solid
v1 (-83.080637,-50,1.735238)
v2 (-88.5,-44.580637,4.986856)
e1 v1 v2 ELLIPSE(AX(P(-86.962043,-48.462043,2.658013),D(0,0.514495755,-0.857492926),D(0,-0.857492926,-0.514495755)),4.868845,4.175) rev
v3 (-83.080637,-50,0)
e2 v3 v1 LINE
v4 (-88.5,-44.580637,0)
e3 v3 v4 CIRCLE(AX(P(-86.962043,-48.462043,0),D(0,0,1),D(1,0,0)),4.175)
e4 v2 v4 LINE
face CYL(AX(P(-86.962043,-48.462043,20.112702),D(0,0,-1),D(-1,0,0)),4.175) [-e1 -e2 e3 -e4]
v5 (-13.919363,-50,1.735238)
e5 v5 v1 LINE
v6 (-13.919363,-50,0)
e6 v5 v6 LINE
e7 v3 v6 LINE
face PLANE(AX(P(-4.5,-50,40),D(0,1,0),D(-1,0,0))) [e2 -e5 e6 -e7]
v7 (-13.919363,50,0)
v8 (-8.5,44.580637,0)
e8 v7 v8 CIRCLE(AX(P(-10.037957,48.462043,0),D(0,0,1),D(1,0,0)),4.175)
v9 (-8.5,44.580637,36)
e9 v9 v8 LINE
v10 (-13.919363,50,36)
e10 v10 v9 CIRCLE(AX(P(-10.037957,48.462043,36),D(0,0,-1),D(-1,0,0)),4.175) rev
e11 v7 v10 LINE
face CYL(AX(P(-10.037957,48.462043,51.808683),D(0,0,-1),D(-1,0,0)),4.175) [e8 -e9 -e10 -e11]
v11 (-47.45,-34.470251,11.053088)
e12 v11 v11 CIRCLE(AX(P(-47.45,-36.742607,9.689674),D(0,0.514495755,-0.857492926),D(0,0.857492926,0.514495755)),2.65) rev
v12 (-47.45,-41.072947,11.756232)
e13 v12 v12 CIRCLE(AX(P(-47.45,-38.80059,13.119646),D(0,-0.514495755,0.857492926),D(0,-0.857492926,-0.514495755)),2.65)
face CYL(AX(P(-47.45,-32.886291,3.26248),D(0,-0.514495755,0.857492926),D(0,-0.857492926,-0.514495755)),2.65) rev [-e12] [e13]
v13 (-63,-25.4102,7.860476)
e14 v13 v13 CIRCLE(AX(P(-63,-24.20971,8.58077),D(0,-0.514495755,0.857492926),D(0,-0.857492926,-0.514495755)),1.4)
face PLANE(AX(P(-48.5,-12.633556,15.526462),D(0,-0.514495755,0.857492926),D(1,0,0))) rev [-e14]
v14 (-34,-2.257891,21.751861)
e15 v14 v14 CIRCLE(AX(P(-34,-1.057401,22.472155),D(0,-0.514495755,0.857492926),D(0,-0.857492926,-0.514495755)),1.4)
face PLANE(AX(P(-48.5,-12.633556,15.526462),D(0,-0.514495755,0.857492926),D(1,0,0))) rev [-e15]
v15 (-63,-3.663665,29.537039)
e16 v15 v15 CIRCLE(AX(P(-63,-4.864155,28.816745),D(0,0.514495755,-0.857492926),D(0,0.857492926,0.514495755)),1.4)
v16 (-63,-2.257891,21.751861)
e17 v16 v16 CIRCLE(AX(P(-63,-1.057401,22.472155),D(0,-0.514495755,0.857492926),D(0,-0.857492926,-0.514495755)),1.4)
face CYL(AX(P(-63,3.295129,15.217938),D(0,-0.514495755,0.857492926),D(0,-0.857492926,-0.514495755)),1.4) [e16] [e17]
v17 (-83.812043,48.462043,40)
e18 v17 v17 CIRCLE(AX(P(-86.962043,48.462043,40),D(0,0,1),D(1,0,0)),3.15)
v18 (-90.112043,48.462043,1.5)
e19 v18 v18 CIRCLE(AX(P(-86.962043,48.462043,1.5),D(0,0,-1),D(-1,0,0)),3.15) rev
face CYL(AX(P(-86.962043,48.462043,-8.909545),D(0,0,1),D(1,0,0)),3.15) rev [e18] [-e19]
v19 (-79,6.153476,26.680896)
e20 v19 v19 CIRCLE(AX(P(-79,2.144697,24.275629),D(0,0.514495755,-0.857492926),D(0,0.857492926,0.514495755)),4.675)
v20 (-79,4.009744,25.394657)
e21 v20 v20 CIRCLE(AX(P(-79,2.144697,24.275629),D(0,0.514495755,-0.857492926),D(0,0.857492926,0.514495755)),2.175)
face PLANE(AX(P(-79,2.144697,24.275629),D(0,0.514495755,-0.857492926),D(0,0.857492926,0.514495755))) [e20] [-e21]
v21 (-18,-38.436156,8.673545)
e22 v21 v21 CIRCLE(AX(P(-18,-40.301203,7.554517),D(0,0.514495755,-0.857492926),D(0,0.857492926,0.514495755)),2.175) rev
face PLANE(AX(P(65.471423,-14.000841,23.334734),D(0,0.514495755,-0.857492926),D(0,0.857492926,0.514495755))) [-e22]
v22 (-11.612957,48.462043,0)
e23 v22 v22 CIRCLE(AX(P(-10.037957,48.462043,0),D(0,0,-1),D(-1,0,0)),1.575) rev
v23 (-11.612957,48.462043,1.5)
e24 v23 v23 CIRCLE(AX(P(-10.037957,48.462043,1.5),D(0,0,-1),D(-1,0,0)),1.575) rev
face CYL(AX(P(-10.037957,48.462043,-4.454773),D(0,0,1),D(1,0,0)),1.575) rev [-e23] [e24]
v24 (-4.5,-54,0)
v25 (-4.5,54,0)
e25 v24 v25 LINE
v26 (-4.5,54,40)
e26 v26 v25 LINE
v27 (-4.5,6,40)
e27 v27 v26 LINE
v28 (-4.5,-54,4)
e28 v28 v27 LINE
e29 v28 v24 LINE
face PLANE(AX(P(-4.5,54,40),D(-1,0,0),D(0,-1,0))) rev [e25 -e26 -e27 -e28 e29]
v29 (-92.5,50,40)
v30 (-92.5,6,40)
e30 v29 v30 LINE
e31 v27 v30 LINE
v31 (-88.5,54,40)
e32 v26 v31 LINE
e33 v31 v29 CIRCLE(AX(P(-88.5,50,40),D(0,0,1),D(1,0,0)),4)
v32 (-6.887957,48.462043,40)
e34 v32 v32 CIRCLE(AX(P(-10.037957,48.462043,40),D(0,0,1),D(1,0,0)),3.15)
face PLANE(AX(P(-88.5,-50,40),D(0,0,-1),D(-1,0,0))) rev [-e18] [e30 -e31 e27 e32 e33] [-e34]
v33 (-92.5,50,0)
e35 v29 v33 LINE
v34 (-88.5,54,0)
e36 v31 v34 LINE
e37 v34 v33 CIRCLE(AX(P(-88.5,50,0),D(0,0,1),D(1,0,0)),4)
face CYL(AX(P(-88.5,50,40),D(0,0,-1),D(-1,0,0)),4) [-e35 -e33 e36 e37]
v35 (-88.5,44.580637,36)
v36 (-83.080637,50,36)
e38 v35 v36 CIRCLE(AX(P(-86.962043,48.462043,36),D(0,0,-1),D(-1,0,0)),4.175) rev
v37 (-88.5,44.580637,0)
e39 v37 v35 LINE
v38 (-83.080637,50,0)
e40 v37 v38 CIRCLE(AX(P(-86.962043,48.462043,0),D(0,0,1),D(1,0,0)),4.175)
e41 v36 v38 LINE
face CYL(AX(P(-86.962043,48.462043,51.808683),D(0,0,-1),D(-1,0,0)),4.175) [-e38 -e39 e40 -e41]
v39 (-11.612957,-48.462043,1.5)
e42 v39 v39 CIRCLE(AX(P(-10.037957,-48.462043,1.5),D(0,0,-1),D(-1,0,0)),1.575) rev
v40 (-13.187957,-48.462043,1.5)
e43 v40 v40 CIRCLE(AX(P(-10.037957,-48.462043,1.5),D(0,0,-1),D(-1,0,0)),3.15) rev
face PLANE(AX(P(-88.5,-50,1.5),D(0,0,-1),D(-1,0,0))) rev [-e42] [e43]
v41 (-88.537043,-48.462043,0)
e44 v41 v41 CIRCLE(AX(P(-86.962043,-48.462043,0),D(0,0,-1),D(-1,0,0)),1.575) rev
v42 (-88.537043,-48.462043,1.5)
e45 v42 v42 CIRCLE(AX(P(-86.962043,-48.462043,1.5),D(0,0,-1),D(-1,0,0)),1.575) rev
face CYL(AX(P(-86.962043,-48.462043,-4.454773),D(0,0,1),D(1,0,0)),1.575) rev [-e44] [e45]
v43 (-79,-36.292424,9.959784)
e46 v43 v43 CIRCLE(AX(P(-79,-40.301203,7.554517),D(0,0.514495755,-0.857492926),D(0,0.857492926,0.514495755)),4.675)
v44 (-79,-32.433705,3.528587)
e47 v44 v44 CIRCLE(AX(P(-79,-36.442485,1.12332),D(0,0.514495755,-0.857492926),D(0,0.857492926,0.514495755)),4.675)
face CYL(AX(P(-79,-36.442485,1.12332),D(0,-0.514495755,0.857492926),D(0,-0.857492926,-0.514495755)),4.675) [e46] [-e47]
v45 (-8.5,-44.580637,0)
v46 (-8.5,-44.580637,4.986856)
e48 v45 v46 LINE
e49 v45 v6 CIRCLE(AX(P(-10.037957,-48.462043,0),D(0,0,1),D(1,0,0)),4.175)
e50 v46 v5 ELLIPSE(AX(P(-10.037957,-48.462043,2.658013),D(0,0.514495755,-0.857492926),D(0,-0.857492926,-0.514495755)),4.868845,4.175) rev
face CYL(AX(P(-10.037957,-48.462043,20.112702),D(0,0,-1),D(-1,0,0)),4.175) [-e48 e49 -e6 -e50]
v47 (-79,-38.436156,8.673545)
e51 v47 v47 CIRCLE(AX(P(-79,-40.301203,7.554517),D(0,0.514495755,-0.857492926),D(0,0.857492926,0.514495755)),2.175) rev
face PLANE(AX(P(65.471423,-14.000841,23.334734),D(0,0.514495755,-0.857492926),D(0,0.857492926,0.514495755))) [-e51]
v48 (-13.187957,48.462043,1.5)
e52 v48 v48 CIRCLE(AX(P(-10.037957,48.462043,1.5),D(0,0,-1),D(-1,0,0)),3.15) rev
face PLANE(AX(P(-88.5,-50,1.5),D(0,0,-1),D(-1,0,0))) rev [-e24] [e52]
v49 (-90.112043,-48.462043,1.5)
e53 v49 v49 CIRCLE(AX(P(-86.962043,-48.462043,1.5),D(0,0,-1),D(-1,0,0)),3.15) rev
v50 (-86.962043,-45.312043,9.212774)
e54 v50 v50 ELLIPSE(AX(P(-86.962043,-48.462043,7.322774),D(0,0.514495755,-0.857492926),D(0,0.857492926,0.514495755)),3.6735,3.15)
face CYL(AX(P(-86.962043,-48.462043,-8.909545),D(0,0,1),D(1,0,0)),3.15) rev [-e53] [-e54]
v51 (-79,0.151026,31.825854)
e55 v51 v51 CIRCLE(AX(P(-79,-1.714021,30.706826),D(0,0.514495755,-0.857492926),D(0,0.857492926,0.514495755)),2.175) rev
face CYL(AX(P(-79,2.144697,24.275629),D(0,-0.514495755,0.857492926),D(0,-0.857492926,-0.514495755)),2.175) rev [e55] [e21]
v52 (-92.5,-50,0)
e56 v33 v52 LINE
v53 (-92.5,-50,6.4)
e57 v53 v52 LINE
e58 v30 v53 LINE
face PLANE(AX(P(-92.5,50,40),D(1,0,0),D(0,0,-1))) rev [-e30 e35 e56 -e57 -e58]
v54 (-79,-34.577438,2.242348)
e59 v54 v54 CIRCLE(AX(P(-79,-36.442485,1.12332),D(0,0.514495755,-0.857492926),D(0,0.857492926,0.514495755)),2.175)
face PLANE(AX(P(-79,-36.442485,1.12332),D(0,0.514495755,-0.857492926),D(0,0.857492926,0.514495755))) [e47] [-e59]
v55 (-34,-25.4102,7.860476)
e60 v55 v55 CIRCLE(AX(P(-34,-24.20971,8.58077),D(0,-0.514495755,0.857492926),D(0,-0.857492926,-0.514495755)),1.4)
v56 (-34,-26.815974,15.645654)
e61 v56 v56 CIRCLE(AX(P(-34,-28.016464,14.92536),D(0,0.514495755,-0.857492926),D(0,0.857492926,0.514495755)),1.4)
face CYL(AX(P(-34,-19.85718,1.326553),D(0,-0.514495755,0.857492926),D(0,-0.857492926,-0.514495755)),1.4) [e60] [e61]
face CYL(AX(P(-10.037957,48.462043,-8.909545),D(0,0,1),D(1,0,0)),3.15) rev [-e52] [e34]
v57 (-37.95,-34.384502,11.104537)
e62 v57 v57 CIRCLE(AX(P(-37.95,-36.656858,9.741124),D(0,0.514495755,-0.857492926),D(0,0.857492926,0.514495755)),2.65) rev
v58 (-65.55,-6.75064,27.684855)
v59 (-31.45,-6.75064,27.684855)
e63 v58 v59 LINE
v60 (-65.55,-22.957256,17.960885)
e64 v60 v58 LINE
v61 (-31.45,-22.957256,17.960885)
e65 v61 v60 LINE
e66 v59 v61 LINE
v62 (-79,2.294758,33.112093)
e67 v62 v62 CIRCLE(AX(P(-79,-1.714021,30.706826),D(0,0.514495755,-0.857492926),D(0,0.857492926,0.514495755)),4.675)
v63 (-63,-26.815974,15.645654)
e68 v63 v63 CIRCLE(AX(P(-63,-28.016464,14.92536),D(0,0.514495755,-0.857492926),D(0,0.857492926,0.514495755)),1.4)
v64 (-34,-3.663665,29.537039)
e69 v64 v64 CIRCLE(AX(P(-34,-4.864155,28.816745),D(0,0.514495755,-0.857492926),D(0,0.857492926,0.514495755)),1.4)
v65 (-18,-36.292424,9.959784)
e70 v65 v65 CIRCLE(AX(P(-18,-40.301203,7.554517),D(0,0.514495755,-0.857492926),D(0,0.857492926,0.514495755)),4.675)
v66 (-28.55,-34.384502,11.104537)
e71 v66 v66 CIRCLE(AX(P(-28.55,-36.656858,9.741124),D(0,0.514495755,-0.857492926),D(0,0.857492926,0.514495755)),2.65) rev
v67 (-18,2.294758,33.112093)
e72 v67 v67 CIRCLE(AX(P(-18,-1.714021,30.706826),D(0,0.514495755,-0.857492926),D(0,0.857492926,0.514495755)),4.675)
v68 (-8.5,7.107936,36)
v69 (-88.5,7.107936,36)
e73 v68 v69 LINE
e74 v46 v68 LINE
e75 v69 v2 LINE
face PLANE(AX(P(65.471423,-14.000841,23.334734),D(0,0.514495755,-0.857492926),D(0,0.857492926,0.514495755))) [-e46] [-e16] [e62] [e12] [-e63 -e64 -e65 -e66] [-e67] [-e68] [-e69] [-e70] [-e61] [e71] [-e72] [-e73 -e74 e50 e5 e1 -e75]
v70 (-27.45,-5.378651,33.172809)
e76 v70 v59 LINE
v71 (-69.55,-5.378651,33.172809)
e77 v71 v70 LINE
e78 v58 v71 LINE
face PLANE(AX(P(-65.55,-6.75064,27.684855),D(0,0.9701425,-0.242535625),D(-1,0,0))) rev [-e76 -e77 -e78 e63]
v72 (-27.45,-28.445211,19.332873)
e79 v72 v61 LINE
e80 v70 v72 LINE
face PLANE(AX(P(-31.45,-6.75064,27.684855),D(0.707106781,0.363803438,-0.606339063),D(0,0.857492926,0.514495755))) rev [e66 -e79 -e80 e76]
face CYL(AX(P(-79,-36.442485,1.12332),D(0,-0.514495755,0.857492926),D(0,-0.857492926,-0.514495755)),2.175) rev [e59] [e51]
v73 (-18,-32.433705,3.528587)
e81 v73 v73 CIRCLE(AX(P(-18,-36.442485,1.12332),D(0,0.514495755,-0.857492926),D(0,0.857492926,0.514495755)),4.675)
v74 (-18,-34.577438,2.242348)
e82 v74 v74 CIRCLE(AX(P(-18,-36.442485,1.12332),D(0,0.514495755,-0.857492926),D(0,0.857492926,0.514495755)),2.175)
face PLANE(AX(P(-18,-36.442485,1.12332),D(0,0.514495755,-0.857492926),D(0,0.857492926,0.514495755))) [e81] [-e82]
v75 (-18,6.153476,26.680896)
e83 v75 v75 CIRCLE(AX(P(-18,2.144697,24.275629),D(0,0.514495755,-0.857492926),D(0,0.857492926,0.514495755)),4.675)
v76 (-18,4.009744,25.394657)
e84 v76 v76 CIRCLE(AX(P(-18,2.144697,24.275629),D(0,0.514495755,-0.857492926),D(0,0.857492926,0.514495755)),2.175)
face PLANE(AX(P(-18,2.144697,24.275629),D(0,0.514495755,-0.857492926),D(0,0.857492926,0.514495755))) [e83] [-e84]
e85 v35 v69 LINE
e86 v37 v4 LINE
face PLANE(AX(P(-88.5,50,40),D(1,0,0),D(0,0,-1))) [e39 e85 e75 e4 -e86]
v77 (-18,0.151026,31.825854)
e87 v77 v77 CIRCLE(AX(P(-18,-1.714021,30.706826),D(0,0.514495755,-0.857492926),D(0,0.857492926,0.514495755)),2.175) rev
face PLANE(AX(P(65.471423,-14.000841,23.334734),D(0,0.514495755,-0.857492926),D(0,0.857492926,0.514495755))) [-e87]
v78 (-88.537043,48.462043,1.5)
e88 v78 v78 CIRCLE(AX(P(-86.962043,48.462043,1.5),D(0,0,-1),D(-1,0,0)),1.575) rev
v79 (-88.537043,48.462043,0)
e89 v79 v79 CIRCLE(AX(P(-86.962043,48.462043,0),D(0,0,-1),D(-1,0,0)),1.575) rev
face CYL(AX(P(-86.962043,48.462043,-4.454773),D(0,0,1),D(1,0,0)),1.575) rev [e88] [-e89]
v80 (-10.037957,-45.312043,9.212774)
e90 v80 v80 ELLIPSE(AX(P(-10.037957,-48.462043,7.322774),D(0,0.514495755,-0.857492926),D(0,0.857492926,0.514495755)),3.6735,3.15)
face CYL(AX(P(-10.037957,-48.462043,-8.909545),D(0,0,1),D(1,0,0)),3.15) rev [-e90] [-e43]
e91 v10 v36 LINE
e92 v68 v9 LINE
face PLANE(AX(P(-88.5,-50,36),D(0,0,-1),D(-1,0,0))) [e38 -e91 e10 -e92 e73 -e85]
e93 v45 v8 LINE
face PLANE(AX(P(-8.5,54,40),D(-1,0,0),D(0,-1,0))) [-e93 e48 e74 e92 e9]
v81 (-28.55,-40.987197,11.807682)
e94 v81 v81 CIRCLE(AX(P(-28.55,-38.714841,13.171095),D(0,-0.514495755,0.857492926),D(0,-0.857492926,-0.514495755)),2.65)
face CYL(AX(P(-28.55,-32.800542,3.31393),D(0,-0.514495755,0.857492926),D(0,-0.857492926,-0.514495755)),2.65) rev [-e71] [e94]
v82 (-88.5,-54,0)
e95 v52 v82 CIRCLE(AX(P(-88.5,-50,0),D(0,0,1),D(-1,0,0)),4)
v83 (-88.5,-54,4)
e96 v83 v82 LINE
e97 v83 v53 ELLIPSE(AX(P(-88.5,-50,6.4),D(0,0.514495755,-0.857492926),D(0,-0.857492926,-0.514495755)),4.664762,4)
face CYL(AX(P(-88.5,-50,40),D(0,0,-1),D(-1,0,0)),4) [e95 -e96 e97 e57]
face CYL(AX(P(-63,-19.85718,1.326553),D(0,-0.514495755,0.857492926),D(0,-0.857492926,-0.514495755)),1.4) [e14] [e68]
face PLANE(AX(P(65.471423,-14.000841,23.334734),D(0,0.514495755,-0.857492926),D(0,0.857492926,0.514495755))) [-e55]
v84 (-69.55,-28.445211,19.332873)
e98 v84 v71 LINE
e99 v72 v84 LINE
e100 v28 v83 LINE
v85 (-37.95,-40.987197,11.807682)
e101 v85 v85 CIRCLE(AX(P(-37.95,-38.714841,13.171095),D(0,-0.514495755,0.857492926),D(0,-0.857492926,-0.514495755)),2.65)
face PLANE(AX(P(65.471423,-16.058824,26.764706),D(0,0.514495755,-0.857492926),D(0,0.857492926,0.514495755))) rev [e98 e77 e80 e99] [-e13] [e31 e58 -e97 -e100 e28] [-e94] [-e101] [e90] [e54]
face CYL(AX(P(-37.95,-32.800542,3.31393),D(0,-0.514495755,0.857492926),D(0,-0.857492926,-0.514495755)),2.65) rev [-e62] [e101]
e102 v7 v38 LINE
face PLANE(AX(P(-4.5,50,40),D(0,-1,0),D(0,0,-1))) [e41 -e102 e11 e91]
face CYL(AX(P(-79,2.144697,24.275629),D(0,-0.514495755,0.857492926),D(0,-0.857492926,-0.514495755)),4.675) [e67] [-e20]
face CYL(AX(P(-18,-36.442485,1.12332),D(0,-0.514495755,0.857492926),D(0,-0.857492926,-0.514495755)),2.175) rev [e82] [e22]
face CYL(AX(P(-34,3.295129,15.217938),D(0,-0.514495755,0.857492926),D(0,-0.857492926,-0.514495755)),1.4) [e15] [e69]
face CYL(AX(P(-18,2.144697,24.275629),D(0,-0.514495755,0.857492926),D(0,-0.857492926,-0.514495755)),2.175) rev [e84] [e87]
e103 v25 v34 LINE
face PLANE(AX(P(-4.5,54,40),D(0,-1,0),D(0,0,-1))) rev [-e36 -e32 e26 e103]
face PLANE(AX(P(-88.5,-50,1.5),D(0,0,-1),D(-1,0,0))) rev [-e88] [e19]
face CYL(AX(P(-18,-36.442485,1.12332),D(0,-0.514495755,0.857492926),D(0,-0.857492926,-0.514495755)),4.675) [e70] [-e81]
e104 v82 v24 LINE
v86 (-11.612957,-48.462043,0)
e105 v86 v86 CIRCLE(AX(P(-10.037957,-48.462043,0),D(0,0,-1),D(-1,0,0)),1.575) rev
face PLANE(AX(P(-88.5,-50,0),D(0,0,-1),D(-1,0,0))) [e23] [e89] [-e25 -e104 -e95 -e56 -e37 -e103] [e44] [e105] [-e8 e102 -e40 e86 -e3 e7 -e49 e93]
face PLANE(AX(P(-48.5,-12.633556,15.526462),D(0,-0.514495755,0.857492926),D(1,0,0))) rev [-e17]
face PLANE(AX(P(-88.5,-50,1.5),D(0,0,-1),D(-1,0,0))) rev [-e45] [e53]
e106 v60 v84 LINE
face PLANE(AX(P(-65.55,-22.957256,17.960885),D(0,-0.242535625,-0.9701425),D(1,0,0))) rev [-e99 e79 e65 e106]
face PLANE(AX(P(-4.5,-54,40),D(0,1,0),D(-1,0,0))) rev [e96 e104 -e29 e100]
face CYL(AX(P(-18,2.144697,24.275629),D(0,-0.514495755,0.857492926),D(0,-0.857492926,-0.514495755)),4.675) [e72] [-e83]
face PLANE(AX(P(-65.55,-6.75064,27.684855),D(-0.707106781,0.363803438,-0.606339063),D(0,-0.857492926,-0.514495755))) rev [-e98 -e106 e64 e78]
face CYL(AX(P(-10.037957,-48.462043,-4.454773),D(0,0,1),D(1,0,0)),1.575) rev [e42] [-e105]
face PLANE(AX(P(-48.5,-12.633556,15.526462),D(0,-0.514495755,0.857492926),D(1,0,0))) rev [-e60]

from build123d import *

# Parameters (mm, degrees)
BOSS_EXTRUDE1_DEPTH = 40
CUT_EXTRUDE1_DEPTH  = 88
SHELL1_START        = -88.5
SHELL1_DEPTH        = 80
BOSS_EXTRUDE2_REACH = 116.334
SKETCH3_R           = 4.175
SKETCH3_3_R         = 4.175
BOSS_EXTRUDE3_DEPTH = 40
SKETCH4_R           = 1.575
CUT_EXTRUDE2_DEPTH  = 40
SKETCH4_3_R         = 3.15
SKETCH4_3_R_2       = 1.575
CUT_EXTRUDE3_DEPTH  = 38.5
SKETCH5_R           = 4.675
SKETCH5_R_2         = 2.175
BOSS_EXTRUDE4_DEPTH = 7.5
SKETCH6_W           = 34.1
SKETCH6_H           = 18.9
CUT_EXTRUDE4_DEPTH  = 4
CHAMFER1_SIZE       = 4
SKETCH8_R           = 2.65
CUT_EXTRUDE5_DEPTH  = 4
SKETCH9_R           = 1.4
BOSS_EXTRUDE7_DEPTH = 7.399


# Read off the part's stored shape, not the designer's step: Shell1
with BuildPart() as part:
    # Sketch1 → Boss-Extrude1 (new body)
    with BuildSketch(Plane.XY):
        with BuildLine():
            Line((-4.5, 54), (-88.5, 54))
            ThreePointArc((-88.5, 54), (-91.328427125, 52.828427125), (-92.5, 50))
            Line((-92.5, 50), (-92.5, -50))
            ThreePointArc((-92.5, -50), (-91.328427125, -52.828427125), (-88.5, -54))
            Line((-88.5, -54), (-4.5, -54))
            Line((-4.5, -54), (-4.5, 54))
        make_face()
    extrude(amount=BOSS_EXTRUDE1_DEPTH)

    # Sketch2 → Cut-Extrude1 (cut)
    with BuildSketch(Plane.ZY.offset(92.5)):
        Polygon((6.4, -50), (40, -50), (40, 6), align=None)
        Polygon((4, -54), (40, -54), (40, -50), (6.4, -50), align=None)
    extrude(amount=-CUT_EXTRUDE1_DEPTH, mode=Mode.SUBTRACT)

    # Shell1 outline → Shell1 (cut)
    with BuildSketch(Plane.YZ.offset(SHELL1_START)):
        Polygon((50, 0), (50, 36), (7.10793586, 36), (-50, 1.735238484), (-50, 0), align=None)
    extrude(amount=SHELL1_DEPTH, mode=Mode.SUBTRACT)

    # Boss-Extrude2: up to this plane
    boss_extrude2_end = Plane(origin=(65.471422738, -14.000840508, 23.33473418), z_dir=(0, 0.5144957554275265, -0.8574929257125443))
    # Sketch3 → Boss-Extrude2 (add, up to the surface)
    with BuildSketch(Plane.XY, mode=Mode.PRIVATE) as boss_extrude2_sk1:
        with Locations((-86.962042751, -48.462042751)):
            Circle(SKETCH3_R)
    boss_extrude2_tool1 = split(extrude(boss_extrude2_sk1.sketch, amount=BOSS_EXTRUDE2_REACH, mode=Mode.PRIVATE), bisect_by=boss_extrude2_end, keep=Keep.BOTH, mode=Mode.PRIVATE)
    add(boss_extrude2_tool1.solids().sort_by_distance((-86.962043, -48.462043, 0))[0])
    # Sketch3 → Boss-Extrude2 (add, up to the surface)
    with BuildSketch(Plane.XY, mode=Mode.PRIVATE) as boss_extrude2_sk2:
        with Locations((-10.037957249, -48.462042751)):
            Circle(SKETCH3_R)
    boss_extrude2_tool2 = split(extrude(boss_extrude2_sk2.sketch, amount=BOSS_EXTRUDE2_REACH, mode=Mode.PRIVATE), bisect_by=boss_extrude2_end, keep=Keep.BOTH, mode=Mode.PRIVATE)
    add(boss_extrude2_tool2.solids().sort_by_distance((-10.037957, -48.462043, 0))[0])

    # Sketch3<3> → Boss-Extrude3 (add)
    with BuildSketch(Plane.XY):
        with Locations((-86.962042751, 48.462042751)):
            Circle(SKETCH3_3_R)
        with Locations((-10.037957249, 48.462042751)):
            Circle(SKETCH3_3_R)
    extrude(amount=BOSS_EXTRUDE3_DEPTH)

    # Sketch4 → Cut-Extrude2 (cut)
    with BuildSketch(Plane.XY.offset(40)):
        with Locations((-86.962042751, 48.462042751)):
            Circle(SKETCH4_R)
        with Locations((-10.037957249, 48.462042751)):
            Circle(SKETCH4_R)
        with Locations(Location((-10.037957249, -48.462042751, 0), (0, 0, 90))):
            Circle(SKETCH4_R)
        with Locations(Location((-86.962042751, -48.462042751, 0), (0, 0, 90))):
            Circle(SKETCH4_R)
    extrude(amount=-CUT_EXTRUDE2_DEPTH, mode=Mode.SUBTRACT)

    # Sketch4<3> → Cut-Extrude3 (cut)
    # profile 1 of 4: a face of its own
    with BuildSketch(Plane.XY.offset(40)):
        with Locations((-86.962042751, 48.462042751)):
            Circle(SKETCH4_3_R)
        with Locations(Location((-86.962042751, 48.462042751, 0), (0, 0, 180))):
            Circle(SKETCH4_3_R_2, mode=Mode.SUBTRACT)
    # profile 2 of 4: a face of its own
    with BuildSketch(Plane.XY.offset(40)):
        with Locations((-10.037957249, 48.462042751)):
            Circle(SKETCH4_3_R)
        with Locations(Location((-10.037957249, 48.462042751, 0), (0, 0, 180))):
            Circle(SKETCH4_3_R_2, mode=Mode.SUBTRACT)
    # profile 3 of 4: a face of its own
    with BuildSketch(Plane.XY.offset(40)):
        with Locations(Location((-10.037957249, -48.462042751, 0), (0, 0, 90))):
            Circle(SKETCH4_3_R)
        with Locations(Location((-10.037957249, -48.462042751, 0), (0, 0, 180))):
            Circle(SKETCH4_3_R_2, mode=Mode.SUBTRACT)
    # profile 4 of 4: a face of its own
    with BuildSketch(Plane.XY.offset(40)):
        with Locations(Location((-86.962042751, -48.462042751, 0), (0, 0, 90))):
            Circle(SKETCH4_3_R)
        with Locations(Location((-86.962042751, -48.462042751, 0), (0, 0, 180))):
            Circle(SKETCH4_3_R_2, mode=Mode.SUBTRACT)
    extrude(amount=-CUT_EXTRUDE3_DEPTH, mode=Mode.SUBTRACT)

    # Sketch5 → Boss-Extrude4 (add)
    # profile 1 of 4: a face of its own
    with BuildSketch(Plane(origin=(0, -14.000840508, 23.33473418), x_dir=(-1, 0, 0), z_dir=(0, 0.5144957554275266, -0.8574929257125442))):
        with Locations(Location((79, -30.671229776, 0), (0, 0, 90))):
            Circle(SKETCH5_R)
        with Locations(Location((79, -30.671229776, 0), (0, 0, 90))):
            Circle(SKETCH5_R_2, mode=Mode.SUBTRACT)
    # profile 2 of 4: a face of its own
    with BuildSketch(Plane(origin=(0, -14.000840508, 23.33473418), x_dir=(-1, 0, 0), z_dir=(0, 0.5144957554275266, -0.8574929257125442))):
        with Locations(Location((18, -30.671229776, 0), (0, 0, 90))):
            Circle(SKETCH5_R)
        with Locations(Location((18, -30.671229776, 0), (0, 0, 90))):
            Circle(SKETCH5_R_2, mode=Mode.SUBTRACT)
    # profile 3 of 4: a face of its own
    with BuildSketch(Plane(origin=(0, -14.000840508, 23.33473418), x_dir=(-1, 0, 0), z_dir=(0, 0.5144957554275266, -0.8574929257125442))):
        with Locations(Location((79, 14.328770224, 0), (0, 0, 90))):
            Circle(SKETCH5_R)
        with Locations(Location((79, 14.328770224, 0), (0, 0, 90))):
            Circle(SKETCH5_R_2, mode=Mode.SUBTRACT)
    # profile 4 of 4: a face of its own
    with BuildSketch(Plane(origin=(0, -14.000840508, 23.33473418), x_dir=(-1, 0, 0), z_dir=(0, 0.5144957554275266, -0.8574929257125442))):
        with Locations(Location((18, 14.328770224, 0), (0, 0, 90))):
            Circle(SKETCH5_R)
        with Locations(Location((18, 14.328770224, 0), (0, 0, 90))):
            Circle(SKETCH5_R_2, mode=Mode.SUBTRACT)
    extrude(amount=BOSS_EXTRUDE4_DEPTH)

    # Sketch6 → Cut-Extrude4 (cut)
    with BuildSketch(Plane(origin=(0, -14.000840508, 23.33473418), x_dir=(-1, 0, 0), z_dir=(0, 0.5144957554275266, -0.8574929257125442))):
        with Locations((48.5, -0.994885818)):
            Rectangle(SKETCH6_W, SKETCH6_H)
    extrude(amount=-CUT_EXTRUDE4_DEPTH, mode=Mode.SUBTRACT)

    # Chamfer1
    chamfer1_edges = [part.edges().sort_by_distance(p)[0] for p in [
        (-48.5, -25.015239228, 21.390856463),
        (-31.45, -16.91193108, 26.252841352),
        (-48.5, -8.808622932, 31.114826241),
        (-65.55, -16.91193108, 26.252841352),
    ]]
    chamfer(chamfer1_edges, length=CHAMFER1_SIZE - 0.0001)  # a hair under: the kernel refuses the full size

    # Sketch8 → Cut-Extrude5 (cut)
    with BuildSketch(Plane(origin=(0, -16.058823529, 26.764705882), x_dir=(1, 0, 0), z_dir=(0, -0.5144957554275266, 0.8574929257125442))):
        with Locations(Location((-47.45, -26.521229776, 0), (0, 0, 270))):
            Circle(SKETCH8_R)
        with Locations(Location((-37.95, -26.421229776, 0), (0, 0, 270))):
            Circle(SKETCH8_R)
        with Locations(Location((-28.55, -26.421229776, 0), (0, 0, 270))):
            Circle(SKETCH8_R)
    extrude(amount=-CUT_EXTRUDE5_DEPTH, mode=Mode.SUBTRACT)

    # Sketch9 → Boss-Extrude7 (add)
    with BuildSketch(Plane(origin=(0, -14.000840508, 23.33473418), x_dir=(-1, 0, 0), z_dir=(0, 0.5144957554275266, -0.8574929257125442))):
        with Locations(Location((63, -16.344885818, 0), (0, 0, 270))):
            Circle(SKETCH9_R)
        with Locations(Location((34, -16.344885818, 0), (0, 0, 270))):
            Circle(SKETCH9_R)
        with Locations(Location((34, 10.655114182, 0), (0, 0, 270))):
            Circle(SKETCH9_R)
        with Locations(Location((63, 10.655114182, 0), (0, 0, 270))):
            Circle(SKETCH9_R)
    extrude(amount=BOSS_EXTRUDE7_DEPTH)


solid = part.part
